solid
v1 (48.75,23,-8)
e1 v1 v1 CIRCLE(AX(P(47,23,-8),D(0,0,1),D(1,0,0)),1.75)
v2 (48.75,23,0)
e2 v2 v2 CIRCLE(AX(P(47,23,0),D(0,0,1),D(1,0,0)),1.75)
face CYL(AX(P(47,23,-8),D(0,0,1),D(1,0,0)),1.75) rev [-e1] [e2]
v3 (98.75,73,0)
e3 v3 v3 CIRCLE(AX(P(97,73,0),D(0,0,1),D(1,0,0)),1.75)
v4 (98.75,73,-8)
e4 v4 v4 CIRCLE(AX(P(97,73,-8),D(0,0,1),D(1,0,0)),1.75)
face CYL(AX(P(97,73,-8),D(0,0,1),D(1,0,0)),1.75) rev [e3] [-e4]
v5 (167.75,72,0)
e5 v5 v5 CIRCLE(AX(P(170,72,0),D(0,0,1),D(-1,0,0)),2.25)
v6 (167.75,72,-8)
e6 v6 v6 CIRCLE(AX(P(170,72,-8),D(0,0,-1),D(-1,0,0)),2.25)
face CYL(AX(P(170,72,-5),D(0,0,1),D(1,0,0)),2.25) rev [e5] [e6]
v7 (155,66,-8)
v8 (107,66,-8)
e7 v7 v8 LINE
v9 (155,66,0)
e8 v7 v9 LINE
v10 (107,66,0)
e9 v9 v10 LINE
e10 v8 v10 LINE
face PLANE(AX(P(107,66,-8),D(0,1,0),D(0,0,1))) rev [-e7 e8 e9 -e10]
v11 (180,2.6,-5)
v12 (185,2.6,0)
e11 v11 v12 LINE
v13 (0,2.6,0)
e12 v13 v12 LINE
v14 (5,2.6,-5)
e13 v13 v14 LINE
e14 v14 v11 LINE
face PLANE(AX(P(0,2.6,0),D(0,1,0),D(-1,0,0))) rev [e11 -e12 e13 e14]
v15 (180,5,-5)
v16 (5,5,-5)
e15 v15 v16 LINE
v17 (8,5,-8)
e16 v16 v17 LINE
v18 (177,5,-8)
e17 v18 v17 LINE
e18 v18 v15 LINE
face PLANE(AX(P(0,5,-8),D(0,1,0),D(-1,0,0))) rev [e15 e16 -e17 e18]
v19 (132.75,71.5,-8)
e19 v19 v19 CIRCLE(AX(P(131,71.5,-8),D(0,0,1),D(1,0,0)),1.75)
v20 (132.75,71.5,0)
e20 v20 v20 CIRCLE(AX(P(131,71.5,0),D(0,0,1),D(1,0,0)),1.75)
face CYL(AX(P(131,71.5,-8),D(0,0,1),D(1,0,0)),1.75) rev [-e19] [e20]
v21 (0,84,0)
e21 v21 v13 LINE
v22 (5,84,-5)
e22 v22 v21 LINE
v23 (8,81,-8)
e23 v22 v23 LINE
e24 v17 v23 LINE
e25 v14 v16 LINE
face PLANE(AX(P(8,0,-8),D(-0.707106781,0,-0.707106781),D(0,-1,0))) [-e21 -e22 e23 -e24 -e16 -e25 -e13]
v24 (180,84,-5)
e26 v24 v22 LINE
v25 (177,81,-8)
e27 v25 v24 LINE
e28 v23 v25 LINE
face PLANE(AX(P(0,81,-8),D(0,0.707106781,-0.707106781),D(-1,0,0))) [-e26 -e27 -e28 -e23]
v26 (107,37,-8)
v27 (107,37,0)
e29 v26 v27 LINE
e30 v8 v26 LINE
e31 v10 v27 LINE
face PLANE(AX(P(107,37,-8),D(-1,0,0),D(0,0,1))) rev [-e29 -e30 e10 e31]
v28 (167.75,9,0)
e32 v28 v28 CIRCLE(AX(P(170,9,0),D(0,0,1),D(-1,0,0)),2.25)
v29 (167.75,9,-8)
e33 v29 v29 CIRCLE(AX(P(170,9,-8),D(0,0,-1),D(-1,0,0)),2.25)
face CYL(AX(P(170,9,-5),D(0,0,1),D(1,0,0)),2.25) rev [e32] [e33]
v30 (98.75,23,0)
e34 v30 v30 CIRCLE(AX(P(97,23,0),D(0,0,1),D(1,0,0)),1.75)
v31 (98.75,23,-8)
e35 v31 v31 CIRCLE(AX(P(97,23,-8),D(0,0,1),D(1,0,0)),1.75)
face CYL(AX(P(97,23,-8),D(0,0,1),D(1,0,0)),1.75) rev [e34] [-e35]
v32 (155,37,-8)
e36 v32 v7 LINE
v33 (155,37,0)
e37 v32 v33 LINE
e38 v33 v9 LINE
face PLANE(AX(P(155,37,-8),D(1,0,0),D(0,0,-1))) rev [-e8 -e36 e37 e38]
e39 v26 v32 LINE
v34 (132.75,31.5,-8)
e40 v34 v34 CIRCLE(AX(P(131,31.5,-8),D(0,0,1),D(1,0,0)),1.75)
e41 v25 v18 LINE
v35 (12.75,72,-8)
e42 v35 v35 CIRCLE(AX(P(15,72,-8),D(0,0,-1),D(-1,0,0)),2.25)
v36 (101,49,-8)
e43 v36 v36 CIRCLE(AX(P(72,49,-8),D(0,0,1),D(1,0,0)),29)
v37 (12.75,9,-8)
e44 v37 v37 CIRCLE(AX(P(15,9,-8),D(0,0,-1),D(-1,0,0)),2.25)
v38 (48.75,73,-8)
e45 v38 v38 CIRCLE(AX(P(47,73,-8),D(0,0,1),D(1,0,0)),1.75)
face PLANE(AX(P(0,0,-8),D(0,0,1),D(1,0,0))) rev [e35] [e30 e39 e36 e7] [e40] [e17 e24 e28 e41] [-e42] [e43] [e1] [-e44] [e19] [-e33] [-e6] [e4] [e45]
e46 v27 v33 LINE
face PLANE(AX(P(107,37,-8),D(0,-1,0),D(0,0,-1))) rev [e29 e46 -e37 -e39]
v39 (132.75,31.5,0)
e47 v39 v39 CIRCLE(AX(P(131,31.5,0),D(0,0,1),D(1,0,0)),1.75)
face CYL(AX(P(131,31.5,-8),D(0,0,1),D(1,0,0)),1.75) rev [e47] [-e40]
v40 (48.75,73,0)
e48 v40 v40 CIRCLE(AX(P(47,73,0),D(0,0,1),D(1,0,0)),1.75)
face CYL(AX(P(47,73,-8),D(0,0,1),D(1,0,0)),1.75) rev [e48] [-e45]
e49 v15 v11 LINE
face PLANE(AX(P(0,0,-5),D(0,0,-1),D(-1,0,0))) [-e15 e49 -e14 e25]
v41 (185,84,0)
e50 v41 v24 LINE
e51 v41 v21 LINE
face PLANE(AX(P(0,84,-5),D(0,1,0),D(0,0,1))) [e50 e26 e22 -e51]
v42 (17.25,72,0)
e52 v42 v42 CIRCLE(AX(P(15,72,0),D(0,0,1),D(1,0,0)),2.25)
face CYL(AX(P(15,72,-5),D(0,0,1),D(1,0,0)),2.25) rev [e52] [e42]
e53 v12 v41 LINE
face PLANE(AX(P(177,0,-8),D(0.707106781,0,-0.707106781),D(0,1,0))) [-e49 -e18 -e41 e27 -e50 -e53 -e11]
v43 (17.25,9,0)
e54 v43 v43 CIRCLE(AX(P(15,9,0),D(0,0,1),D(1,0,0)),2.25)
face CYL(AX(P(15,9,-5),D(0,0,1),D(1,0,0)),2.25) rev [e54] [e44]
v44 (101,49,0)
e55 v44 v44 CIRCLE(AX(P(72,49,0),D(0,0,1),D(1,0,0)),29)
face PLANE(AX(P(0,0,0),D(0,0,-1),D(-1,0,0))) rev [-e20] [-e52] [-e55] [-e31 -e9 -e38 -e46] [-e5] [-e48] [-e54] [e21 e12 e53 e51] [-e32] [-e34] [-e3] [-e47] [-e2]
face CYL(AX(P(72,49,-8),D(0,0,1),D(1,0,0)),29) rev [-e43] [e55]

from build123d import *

# Parameters (mm, degrees)
SKETCH1_W           = 185
SKETCH1_H           = 84
SKETCH1_R           = 2.25
BOSS_EXTRUDE1_DEPTH = 5
SKETCH2_W           = 185
SKETCH2_H           = 79
SKETCH2_R           = 2.25
BOSS_EXTRUDE2_DEPTH = 3
CHAMFER1_SIZE       = 8
CHAMFER3_SIZE       = 3
SKETCH3_W           = 7.071067812
SKETCH3_H           = 2.6
CUT_EXTRUDE1_DEPTH  = 221.270985121
SKETCH4_R           = 29
SKETCH4_R_2         = 1.75
SKETCH4_W           = 48
SKETCH4_H           = 29
CUT_EXTRUDE2_DEPTH  = 204.334699449


with BuildPart() as part:
    # Sketch1 → Boss-Extrude1 (new body)
    with BuildSketch(Plane.XY):
        with Locations((92.5, 42)):
            Rectangle(SKETCH1_W, SKETCH1_H)
        with Locations((15, 9)):
            Circle(SKETCH1_R, mode=Mode.SUBTRACT)
        with Locations(Location((170, 9, 0), (0, 0, 180))):
            Circle(SKETCH1_R, mode=Mode.SUBTRACT)
        with Locations((15, 72)):
            Circle(SKETCH1_R, mode=Mode.SUBTRACT)
        with Locations(Location((170, 72, 0), (0, 0, 180))):
            Circle(SKETCH1_R, mode=Mode.SUBTRACT)
    extrude(amount=-BOSS_EXTRUDE1_DEPTH)

    # Sketch2 → Boss-Extrude2 (add)
    with BuildSketch(Plane(origin=(0, 0, -5), x_dir=(-1, 0, 0), z_dir=(0, 0, -1))):
        with Locations((-92.5, 44.5)):
            Rectangle(SKETCH2_W, SKETCH2_H)
        with Locations(Location((-15, 9, 0), (0, 0, 180))):
            Circle(SKETCH2_R, mode=Mode.SUBTRACT)
        with Locations((-170, 9)):
            Circle(SKETCH2_R, mode=Mode.SUBTRACT)
        with Locations(Location((-15, 72, 0), (0, 0, 180))):
            Circle(SKETCH2_R, mode=Mode.SUBTRACT)
        with Locations((-170, 72)):
            Circle(SKETCH2_R, mode=Mode.SUBTRACT)
    extrude(amount=BOSS_EXTRUDE2_DEPTH)

    # Chamfer1
    # the kernel refuses this chamfer: 8 mm, written as the material it takes off along each edge
    with BuildSketch(Plane(origin=(185, -15.573463904, -8), x_dir=(-0.9996219169112968, 0, -0.027495876610586296), z_dir=(0, 1, 0)), Plane(origin=(0, 104.573463904, -8), x_dir=(0.9996219169112968, 0, -0.027495876610586275), z_dir=(0, -1, 0))) as chamfer1_piece_1:
        Polygon((CHAMFER1_SIZE * 0.999621916911, CHAMFER1_SIZE * 0.0274958766106), (-CHAMFER1_SIZE * 0.0274958766106, CHAMFER1_SIZE * 0.999621916911), (0, 0), align=None)
    extrude(amount=120.146927807, mode=Mode.SUBTRACT)

    # Chamfer3
    chamfer3_edges = [part.edges().sort_by_distance(p)[0] for p in [
        (92.5, 84, -8),
    ]]
    chamfer(chamfer3_edges, length=CHAMFER3_SIZE)

    # Sketch3 → Cut-Extrude1 (cut, through all, along a direction that is not the sketch's normal)
    with BuildSketch(Plane(origin=(92.5, 0, -92.5), x_dir=(-0.7071067811865452, 0, -0.7071067811865498), z_dir=(0.7071067811865498, 0, -0.7071067811865452))):
        with Locations((-127.279220614, 1.3)):
            Rectangle(SKETCH3_W, SKETCH3_H)
    extrude(amount=-CUT_EXTRUDE1_DEPTH, dir=(1, 0, 0), mode=Mode.SUBTRACT)

    # Sketch4 → Cut-Extrude2 (cut, through all)
    with BuildSketch(Plane.XY):
        with Locations((72, 49)):
            Circle(SKETCH4_R)
        with Locations((47, 73)):
            Circle(SKETCH4_R_2)
        with Locations((97, 73)):
            Circle(SKETCH4_R_2)
        with Locations((97, 23)):
            Circle(SKETCH4_R_2)
        with Locations((47, 23)):
            Circle(SKETCH4_R_2)
        with Locations((131, 71.5)):
            Circle(SKETCH4_R_2)
        with Locations((131, 31.5)):
            Circle(SKETCH4_R_2)
        with Locations((131, 51.5)):
            Rectangle(SKETCH4_W, SKETCH4_H)
    extrude(amount=-CUT_EXTRUDE2_DEPTH, mode=Mode.SUBTRACT)


solid = part.part
